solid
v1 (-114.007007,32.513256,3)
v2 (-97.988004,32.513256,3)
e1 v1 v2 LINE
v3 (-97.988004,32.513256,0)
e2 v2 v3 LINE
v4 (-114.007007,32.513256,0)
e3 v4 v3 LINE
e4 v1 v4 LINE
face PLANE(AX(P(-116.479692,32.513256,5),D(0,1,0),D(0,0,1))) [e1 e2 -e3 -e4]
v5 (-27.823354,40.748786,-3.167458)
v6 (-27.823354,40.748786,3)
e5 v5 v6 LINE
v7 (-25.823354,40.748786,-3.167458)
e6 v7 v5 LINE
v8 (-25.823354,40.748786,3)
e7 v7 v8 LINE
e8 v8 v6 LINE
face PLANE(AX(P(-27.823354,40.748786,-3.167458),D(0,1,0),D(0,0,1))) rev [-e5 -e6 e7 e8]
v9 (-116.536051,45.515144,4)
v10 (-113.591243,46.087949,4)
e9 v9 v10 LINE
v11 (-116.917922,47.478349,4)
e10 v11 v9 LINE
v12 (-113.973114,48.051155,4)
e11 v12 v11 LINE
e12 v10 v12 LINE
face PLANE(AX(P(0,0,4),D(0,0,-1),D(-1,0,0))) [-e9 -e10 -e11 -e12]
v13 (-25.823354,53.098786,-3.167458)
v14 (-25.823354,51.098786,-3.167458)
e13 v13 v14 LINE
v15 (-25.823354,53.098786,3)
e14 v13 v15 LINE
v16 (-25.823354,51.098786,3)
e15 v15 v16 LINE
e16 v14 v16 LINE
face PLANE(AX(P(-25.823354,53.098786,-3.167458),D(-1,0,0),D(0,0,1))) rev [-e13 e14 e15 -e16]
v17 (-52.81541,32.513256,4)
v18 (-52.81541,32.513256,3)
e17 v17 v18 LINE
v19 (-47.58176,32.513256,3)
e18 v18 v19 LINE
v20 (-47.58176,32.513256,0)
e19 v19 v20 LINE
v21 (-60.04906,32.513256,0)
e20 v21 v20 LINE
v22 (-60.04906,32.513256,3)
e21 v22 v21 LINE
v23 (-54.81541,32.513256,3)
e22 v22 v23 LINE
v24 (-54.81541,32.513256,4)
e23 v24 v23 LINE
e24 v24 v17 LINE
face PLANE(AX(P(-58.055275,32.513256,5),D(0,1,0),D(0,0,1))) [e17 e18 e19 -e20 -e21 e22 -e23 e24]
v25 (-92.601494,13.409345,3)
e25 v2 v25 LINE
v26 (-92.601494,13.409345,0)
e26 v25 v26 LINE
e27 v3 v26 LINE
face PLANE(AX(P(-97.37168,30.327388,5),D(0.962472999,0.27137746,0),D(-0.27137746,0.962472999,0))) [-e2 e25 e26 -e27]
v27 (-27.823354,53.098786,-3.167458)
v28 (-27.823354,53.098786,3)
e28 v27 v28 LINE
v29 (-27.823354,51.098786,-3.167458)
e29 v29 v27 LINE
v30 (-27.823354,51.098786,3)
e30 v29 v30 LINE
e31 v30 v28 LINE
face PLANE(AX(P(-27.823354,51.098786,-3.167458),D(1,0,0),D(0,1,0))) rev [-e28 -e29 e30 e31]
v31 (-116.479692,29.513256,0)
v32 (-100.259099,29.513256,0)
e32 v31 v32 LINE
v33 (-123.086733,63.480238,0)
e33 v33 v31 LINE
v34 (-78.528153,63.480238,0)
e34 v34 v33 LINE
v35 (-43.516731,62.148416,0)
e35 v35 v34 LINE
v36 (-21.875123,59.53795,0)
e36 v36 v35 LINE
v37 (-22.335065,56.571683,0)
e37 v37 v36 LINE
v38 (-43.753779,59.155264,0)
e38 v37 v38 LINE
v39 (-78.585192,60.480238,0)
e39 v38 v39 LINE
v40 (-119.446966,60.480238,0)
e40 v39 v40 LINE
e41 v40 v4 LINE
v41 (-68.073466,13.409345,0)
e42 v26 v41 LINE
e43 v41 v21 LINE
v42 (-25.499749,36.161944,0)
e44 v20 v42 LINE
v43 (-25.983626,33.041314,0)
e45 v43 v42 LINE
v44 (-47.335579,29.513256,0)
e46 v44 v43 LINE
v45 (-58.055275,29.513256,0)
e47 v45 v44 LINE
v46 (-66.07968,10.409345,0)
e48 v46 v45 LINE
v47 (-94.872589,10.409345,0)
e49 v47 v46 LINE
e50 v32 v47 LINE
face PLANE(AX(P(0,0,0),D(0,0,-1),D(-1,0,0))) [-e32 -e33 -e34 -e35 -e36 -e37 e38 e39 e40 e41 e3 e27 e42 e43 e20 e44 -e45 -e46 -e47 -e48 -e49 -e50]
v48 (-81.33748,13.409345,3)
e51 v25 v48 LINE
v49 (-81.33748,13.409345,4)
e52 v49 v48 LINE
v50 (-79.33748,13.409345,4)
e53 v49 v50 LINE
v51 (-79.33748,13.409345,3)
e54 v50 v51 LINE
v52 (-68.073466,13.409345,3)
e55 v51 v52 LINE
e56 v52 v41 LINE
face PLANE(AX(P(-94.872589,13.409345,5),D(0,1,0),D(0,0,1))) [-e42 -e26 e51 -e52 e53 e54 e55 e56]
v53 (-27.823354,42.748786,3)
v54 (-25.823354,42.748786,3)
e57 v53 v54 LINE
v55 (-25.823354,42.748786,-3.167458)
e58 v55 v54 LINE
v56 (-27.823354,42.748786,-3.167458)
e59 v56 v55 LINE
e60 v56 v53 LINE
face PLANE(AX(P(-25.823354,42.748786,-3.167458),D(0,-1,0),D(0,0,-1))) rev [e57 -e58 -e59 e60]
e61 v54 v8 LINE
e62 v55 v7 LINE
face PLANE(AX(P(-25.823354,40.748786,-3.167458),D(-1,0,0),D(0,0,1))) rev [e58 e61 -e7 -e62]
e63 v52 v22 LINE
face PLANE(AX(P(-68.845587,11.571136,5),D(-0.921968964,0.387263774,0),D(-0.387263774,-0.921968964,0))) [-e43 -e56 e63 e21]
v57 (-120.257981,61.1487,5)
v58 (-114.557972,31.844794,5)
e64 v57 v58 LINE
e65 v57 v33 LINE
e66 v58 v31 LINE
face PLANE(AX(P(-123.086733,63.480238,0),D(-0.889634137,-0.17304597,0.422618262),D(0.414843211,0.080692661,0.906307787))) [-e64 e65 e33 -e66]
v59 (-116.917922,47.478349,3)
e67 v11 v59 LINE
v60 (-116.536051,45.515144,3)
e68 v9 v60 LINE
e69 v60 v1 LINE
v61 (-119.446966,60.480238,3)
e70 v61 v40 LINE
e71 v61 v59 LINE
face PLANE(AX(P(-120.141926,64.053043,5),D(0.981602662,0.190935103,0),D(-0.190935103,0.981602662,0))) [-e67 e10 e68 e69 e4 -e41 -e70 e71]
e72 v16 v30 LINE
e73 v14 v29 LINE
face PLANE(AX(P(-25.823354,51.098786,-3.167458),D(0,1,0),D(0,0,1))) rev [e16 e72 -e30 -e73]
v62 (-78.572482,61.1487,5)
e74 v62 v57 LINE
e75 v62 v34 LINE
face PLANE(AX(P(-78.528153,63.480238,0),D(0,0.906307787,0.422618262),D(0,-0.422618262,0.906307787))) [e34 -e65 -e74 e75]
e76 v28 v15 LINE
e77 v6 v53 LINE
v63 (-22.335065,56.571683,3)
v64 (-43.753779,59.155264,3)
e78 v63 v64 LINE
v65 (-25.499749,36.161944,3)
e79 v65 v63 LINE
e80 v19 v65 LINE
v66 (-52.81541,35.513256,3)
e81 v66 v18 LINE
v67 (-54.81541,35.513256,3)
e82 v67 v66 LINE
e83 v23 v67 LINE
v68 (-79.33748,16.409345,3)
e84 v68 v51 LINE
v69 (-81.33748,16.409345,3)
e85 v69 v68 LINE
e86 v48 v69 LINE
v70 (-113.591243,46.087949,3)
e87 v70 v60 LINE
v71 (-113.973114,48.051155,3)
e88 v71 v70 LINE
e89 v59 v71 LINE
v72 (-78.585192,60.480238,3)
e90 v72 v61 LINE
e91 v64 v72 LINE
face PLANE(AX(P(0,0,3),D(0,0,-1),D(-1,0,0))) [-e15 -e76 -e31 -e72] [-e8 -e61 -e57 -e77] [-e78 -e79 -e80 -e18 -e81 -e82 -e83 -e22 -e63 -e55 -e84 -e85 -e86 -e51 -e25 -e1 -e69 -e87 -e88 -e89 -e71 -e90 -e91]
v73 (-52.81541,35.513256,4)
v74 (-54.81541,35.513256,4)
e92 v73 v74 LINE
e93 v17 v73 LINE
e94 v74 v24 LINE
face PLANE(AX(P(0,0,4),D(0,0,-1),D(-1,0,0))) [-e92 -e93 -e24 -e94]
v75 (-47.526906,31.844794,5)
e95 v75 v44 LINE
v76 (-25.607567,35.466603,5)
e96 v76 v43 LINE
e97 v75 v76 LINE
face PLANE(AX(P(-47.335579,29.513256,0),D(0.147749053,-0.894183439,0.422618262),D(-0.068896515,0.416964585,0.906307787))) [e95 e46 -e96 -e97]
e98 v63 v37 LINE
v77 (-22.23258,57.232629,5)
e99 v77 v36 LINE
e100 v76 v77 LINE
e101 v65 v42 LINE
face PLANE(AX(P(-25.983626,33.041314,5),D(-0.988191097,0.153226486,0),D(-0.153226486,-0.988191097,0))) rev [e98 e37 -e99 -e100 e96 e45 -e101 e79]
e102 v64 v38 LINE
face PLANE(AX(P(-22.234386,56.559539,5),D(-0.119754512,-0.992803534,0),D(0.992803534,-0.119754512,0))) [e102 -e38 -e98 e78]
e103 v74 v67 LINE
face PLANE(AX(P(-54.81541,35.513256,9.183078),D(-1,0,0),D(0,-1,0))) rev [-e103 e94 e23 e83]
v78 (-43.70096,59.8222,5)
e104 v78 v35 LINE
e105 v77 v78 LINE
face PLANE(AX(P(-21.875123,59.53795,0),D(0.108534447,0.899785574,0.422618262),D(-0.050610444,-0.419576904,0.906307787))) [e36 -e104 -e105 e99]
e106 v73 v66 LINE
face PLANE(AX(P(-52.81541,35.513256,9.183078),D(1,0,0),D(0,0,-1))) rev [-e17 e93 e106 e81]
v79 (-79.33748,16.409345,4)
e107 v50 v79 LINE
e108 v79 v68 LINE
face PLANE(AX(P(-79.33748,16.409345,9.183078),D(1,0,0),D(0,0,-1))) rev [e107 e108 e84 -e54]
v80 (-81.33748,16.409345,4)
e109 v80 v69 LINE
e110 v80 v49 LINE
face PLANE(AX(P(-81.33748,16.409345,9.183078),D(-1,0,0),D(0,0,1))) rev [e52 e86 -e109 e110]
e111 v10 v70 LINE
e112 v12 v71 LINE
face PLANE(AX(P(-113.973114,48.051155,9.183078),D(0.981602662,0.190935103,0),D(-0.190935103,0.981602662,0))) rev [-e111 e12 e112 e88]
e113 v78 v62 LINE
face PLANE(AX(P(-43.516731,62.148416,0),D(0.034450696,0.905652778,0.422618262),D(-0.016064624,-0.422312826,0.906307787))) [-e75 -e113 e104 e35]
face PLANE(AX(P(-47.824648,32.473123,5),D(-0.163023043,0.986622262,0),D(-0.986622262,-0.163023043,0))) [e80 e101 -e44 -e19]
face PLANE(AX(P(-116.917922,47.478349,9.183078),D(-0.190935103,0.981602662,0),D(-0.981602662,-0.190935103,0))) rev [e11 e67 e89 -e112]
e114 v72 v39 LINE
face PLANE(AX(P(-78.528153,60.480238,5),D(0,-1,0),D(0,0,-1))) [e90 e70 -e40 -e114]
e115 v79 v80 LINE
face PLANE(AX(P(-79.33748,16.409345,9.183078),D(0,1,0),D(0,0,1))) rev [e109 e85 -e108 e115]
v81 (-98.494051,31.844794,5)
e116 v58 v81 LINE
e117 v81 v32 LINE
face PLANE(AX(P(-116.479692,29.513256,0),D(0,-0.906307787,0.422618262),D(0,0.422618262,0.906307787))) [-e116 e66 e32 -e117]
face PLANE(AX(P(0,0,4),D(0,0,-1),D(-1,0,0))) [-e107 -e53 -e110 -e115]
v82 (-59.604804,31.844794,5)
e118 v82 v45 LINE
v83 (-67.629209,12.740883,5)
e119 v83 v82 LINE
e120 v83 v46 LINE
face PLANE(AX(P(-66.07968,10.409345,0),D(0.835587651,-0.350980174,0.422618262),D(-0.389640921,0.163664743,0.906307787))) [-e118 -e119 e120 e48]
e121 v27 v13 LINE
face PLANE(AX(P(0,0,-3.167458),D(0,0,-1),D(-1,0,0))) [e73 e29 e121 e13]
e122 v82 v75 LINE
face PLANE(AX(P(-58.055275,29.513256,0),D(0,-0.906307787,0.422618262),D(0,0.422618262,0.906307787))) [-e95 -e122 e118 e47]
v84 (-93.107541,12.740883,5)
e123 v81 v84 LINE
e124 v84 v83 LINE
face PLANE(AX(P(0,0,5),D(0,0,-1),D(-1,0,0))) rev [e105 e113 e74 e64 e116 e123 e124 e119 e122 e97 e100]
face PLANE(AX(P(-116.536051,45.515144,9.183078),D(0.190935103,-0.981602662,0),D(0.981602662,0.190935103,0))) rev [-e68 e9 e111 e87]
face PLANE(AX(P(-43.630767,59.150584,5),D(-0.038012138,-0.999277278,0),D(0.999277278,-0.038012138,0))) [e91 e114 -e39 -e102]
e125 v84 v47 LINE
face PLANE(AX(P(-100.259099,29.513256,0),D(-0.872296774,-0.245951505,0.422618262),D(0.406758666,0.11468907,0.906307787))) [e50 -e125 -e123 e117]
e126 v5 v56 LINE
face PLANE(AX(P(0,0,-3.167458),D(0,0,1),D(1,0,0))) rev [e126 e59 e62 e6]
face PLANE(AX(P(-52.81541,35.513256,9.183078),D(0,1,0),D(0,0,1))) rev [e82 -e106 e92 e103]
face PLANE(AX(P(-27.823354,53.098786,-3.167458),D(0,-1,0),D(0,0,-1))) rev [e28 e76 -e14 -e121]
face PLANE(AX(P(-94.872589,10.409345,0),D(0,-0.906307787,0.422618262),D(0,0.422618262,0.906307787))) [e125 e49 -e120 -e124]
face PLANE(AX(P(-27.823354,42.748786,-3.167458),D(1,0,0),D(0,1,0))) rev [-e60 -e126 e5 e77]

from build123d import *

# Parameters (mm, degrees)
BOSS_EXTRUDE1_DEPTH = 5
SHELL1_DEPTH        = 3
DRAFT1_ANGLE        = -25
CUT_EXTRUDE4_DEPTH  = 3
SKETCH7_W           = 2
SKETCH7_H           = 2
BOSS_EXTRUDE3_DEPTH = 6.167458
SKETCH9_W           = 2
SKETCH9_H           = 3
CUT_EXTRUDE5_DEPTH  = 1


# Read off the part's stored shape, not the designer's step: Shell1
with BuildPart() as part:
    # Sketch1 → Boss-Extrude1 (new body)
    with BuildSketch(Plane.XY):
        Polygon((-25.983626021, 33.041313611), (-21.875122617, 59.537949952), (-43.516730546, 62.148416278), (-78.528153024, 63.480237824), (-123.086733491, 63.480237824), (-116.479692334, 29.513255832), (-100.259099485, 29.513255832), (-94.872589048, 10.409344773), (-66.079679944, 10.409344773), (-58.05527459, 29.513255832), (-47.335578993, 29.513255832), align=None)
    extrude(amount=BOSS_EXTRUDE1_DEPTH)

    # Shell1 outline → Shell1 (cut)
    with BuildSketch(Plane.XY):
        Polygon((-47.581760232, 32.513255832), (-27.576866011, 35.818734388), (-24.321805769, 56.811329265), (-43.753778982, 59.155263778), (-78.585191842, 60.480237824), (-119.446966155, 60.480237824), (-114.007006811, 32.513255832), (-97.988004481, 32.513255832), (-92.601494043, 13.409344773), (-68.0734658, 13.409344773), (-60.049060446, 32.513255832), align=None)
    extrude(amount=SHELL1_DEPTH, mode=Mode.SUBTRACT)

    # Draft1
    draft1_faces = [part.faces().sort_by_distance(p)[0] for p in [
        (-52.695426792, 29.513255832, 2.5),
        (-36.659602507, 31.277284722, 2.5),
        (-62.067477267, 19.961300303, 2.5),
        (-80.476134496, 10.409344773, 2.5),
        (-97.565844267, 19.961300303, 2.5),
        (-108.36939591, 29.513255832, 2.5),
        (-119.783212913, 46.496746828, 2.5),
        (-32.695926582, 60.843183115, 2.5),
        (-61.022441785, 62.814327051, 2.5),
        (-100.807443258, 63.480237824, 2.5),
    ]]
    draft(draft1_faces, Plane(origin=(0, 0, 0), x_dir=(-1, 0, 0), z_dir=(0, 0, -1)), DRAFT1_ANGLE)

    # Sketch6 → Cut-Extrude4 (cut)
    with BuildSketch(Plane(origin=(0, 0, 0), x_dir=(-1, 0, 0), z_dir=(0, 0, -1))):
        Polygon((24.321805769, 56.811329265), (22.335064622, 56.571683446), (25.499748774, 36.161943725), (27.576866011, 35.818734388), align=None)
    extrude(amount=-CUT_EXTRUDE4_DEPTH, mode=Mode.SUBTRACT)

    # Sketch7 → Boss-Extrude3 (add)
    with BuildSketch(Plane(origin=(0, 0, 3), x_dir=(-1, 0, 0), z_dir=(0, 0, -1))):
        with Locations((26.823354353, 52.098786124)):
            Rectangle(SKETCH7_W, SKETCH7_H)
        with Locations((26.823354353, 41.748786124)):
            Rectangle(SKETCH7_W, SKETCH7_H)
    extrude(amount=BOSS_EXTRUDE3_DEPTH)

    # Sketch9 → Cut-Extrude5 (cut)
    with BuildSketch(Plane(origin=(0, 0, 3), x_dir=(-1, 0, 0), z_dir=(0, 0, -1))):
        with Locations((80.337479922, 14.909344773)):
            Rectangle(SKETCH9_W, SKETCH9_H)
        with Locations((53.815410339, 34.013255832)):
            Rectangle(SKETCH9_W, SKETCH9_H)
        Polygon((116.917921585, 47.47834949), (113.973113599, 48.051154798), (113.591243393, 46.087949474), (116.53605138, 45.515144166), align=None)
    extrude(amount=-CUT_EXTRUDE5_DEPTH, mode=Mode.SUBTRACT)


solid = part.part
